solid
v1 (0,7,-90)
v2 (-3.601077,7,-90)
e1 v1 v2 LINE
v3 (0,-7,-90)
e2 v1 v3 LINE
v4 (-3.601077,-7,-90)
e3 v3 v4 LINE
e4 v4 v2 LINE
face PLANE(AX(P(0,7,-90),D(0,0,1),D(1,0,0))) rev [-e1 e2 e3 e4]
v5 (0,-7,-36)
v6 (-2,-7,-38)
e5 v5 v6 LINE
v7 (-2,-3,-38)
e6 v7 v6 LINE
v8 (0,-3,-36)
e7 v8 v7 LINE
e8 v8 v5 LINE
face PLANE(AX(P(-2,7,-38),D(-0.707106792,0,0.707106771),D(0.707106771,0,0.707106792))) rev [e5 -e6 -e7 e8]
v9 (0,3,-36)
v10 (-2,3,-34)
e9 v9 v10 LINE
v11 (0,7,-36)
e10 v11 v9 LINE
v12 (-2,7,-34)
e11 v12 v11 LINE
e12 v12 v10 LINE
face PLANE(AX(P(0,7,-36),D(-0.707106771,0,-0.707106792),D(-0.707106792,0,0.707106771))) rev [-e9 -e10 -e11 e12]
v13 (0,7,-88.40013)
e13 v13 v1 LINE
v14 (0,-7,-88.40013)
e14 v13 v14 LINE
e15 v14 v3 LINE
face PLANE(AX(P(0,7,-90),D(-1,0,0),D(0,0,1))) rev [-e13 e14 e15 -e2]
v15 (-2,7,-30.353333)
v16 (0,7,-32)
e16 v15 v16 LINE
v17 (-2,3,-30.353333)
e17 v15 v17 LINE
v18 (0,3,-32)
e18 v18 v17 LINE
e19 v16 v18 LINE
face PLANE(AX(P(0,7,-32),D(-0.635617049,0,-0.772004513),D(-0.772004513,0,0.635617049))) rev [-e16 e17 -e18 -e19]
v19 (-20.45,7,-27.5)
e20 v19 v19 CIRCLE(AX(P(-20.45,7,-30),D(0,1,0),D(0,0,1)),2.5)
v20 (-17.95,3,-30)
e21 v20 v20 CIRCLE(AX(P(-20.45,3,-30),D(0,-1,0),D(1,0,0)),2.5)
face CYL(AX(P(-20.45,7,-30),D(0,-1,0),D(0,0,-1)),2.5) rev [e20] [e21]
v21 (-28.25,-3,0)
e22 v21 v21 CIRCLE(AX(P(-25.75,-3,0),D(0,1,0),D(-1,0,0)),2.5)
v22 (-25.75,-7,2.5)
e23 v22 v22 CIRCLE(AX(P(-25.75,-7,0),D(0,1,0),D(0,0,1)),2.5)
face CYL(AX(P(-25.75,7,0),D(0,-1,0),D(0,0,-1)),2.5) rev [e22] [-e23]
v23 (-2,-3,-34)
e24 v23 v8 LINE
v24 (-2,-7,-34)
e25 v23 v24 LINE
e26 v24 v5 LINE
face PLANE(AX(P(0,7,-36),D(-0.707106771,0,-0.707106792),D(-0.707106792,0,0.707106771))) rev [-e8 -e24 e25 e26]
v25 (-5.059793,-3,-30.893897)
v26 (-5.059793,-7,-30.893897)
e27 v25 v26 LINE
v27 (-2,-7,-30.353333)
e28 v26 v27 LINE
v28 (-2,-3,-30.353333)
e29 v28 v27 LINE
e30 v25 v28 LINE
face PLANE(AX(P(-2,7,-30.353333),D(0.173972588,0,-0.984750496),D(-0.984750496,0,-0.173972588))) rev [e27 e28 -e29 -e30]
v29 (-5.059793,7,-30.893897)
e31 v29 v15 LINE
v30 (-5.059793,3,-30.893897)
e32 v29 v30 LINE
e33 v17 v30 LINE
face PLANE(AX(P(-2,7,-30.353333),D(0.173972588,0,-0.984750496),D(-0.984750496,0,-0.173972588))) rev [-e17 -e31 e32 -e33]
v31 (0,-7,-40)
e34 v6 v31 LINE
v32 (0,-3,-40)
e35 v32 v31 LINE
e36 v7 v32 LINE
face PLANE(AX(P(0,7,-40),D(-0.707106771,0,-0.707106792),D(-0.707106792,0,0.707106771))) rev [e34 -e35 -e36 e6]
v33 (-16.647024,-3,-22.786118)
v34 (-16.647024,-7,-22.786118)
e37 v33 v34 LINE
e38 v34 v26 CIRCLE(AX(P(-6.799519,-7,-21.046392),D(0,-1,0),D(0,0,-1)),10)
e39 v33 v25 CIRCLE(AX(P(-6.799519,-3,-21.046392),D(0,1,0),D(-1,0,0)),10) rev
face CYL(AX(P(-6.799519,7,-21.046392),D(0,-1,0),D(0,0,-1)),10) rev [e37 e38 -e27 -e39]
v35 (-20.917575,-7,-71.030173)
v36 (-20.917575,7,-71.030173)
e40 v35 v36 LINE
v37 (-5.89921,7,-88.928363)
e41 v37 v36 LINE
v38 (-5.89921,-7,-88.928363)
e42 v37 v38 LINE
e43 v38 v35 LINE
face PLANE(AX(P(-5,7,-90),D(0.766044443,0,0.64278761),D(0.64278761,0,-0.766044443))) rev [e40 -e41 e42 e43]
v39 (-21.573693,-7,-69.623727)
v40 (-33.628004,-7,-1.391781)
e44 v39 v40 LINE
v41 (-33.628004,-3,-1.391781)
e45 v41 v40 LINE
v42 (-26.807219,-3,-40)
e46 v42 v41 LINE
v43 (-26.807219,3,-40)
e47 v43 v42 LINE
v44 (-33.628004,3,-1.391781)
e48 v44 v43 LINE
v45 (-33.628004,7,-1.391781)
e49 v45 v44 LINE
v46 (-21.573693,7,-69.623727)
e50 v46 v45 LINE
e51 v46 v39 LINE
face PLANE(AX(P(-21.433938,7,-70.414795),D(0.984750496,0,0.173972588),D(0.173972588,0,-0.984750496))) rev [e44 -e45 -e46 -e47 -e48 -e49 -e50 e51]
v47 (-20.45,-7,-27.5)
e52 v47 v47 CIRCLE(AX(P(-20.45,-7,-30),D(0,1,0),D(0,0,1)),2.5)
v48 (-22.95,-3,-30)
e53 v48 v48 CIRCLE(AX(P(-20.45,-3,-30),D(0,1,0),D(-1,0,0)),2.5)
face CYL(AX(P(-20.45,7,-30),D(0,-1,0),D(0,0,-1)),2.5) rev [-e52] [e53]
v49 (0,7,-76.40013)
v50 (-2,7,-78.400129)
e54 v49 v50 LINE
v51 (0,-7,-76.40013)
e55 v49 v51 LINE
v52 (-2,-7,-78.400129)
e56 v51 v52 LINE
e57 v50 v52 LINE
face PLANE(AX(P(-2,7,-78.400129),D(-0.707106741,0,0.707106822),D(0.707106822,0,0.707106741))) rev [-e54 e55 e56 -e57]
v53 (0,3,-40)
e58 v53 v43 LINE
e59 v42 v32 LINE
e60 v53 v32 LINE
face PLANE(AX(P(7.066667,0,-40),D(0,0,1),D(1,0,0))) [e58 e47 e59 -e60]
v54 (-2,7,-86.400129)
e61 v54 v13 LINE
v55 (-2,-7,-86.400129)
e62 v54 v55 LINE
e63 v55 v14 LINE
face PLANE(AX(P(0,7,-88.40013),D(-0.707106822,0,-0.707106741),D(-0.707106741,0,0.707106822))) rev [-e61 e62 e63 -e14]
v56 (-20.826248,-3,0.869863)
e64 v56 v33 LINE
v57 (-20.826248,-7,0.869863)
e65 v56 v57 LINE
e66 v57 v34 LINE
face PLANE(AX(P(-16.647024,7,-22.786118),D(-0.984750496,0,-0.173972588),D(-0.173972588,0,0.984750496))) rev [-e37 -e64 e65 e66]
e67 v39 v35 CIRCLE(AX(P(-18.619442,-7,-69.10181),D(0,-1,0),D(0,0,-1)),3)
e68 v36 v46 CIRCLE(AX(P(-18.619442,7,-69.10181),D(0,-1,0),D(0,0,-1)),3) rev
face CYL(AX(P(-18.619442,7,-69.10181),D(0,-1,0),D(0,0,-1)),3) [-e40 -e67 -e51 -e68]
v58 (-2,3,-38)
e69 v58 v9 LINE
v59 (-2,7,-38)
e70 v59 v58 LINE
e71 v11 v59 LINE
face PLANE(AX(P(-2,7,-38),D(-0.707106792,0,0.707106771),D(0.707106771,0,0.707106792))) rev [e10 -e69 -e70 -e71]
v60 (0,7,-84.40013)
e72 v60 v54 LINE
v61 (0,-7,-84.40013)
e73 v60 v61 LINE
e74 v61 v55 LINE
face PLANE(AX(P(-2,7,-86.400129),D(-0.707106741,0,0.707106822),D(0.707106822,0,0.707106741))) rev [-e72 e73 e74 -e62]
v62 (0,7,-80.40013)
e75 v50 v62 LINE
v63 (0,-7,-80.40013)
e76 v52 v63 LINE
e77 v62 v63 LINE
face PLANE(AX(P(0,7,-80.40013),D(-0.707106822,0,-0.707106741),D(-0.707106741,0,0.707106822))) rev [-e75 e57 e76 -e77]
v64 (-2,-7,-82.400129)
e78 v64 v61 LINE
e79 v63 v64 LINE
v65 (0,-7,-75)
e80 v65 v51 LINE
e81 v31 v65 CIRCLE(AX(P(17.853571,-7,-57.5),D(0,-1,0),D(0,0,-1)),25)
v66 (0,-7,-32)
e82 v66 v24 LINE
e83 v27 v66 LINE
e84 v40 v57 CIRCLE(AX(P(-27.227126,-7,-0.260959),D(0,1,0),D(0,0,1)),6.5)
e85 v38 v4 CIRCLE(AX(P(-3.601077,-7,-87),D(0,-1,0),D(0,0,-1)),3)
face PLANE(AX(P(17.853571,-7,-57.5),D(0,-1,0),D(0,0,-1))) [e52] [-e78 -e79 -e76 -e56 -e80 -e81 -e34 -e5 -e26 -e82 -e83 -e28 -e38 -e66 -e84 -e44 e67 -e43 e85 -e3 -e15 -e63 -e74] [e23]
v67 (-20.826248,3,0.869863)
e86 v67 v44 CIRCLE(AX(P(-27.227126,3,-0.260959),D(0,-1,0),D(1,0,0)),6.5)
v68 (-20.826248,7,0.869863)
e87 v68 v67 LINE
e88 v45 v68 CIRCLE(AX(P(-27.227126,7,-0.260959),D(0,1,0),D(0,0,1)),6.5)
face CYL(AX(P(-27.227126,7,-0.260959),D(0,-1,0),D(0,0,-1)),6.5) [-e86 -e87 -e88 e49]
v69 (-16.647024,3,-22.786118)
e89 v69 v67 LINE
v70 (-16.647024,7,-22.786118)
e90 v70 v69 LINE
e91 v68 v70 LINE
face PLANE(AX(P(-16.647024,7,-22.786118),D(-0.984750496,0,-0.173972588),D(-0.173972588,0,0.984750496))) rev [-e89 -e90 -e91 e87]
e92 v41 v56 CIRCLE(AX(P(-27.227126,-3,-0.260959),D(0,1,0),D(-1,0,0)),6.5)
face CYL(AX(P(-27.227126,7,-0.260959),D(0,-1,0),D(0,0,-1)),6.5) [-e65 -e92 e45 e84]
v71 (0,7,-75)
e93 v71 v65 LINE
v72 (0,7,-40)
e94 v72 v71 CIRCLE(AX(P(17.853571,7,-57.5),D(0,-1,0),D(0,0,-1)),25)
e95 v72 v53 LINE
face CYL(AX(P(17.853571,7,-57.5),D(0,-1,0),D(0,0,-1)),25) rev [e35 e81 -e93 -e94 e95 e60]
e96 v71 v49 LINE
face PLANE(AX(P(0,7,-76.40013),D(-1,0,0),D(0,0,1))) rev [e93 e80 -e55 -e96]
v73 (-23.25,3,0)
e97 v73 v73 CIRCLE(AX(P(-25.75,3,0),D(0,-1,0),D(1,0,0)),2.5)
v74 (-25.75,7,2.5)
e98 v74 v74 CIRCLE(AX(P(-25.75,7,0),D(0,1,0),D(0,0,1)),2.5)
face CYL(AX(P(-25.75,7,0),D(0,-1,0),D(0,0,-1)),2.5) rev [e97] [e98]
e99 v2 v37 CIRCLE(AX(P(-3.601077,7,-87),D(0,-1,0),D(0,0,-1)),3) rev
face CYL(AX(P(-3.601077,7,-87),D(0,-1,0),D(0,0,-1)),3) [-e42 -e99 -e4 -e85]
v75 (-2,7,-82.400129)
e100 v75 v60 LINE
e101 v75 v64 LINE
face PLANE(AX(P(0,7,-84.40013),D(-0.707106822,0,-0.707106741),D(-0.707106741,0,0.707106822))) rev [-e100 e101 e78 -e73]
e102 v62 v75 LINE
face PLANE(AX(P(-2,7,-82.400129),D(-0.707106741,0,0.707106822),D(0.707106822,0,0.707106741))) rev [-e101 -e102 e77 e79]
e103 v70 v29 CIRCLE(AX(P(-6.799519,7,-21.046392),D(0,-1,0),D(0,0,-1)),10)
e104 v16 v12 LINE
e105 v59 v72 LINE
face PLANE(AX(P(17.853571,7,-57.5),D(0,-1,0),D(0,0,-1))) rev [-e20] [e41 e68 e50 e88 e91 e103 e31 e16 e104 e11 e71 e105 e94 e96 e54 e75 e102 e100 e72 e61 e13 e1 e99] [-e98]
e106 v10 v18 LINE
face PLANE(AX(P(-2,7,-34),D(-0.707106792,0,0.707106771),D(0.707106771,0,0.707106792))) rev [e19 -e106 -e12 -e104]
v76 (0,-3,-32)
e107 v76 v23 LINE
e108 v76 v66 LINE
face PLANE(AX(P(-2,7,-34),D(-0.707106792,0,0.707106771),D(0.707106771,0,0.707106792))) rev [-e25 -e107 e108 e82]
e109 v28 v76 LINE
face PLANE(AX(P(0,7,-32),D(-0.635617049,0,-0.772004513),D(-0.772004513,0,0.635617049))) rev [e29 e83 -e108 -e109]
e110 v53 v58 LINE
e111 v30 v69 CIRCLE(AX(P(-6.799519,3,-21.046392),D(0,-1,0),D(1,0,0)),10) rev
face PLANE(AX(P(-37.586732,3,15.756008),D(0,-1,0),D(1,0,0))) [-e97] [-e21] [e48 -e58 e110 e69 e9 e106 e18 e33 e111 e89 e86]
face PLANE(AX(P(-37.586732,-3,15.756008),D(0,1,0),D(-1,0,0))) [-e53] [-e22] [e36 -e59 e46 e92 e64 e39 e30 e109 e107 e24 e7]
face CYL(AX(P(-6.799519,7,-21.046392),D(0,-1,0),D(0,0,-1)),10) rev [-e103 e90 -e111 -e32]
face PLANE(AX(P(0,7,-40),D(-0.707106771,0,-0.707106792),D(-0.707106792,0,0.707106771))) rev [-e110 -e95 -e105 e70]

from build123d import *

# Parameters (mm, degrees)
SKETCH1_R              = 2.5
BOSS_EXTRUDE1_DEPTH    = 7
CUT_EXTRUDE1_START     = -40
CUT_EXTRUDE1_OUTLINE_W = 34.803170534
CUT_EXTRUDE1_OUTLINE_H = 6
CUT_EXTRUDE1_DEPTH     = 46.239041119
FILLET1_R              = 3


# Read off the part's stored shape, not the designer's step: Cut-Extrude1
with BuildPart() as part:
    # Sketch1 → Boss-Extrude1 (new, symmetric)
    with BuildSketch(Plane(origin=(0, 0, 0), x_dir=(1, 0, 0), z_dir=(0, 1, 0))):
        with BuildLine():
            Line((-16.647024265, 22.786117759), (-20.826247522, -0.869862938))
            ThreePointArc((-20.826247522, -0.869862938), (-28.357947563, -6.139919341), (-33.628003966, 1.391780701))
            Line((-33.628003966, 1.391780701), (-21.433938056, 70.414795281))
            Line((-21.433938056, 70.414795281), (-5, 90))
            Line((-5, 90), (0, 90))
            Line((0, 90), (0, 88.40012962))
            Line((0, 88.40012962), (-2, 86.400129391))
            Line((-2, 86.400129391), (0, 84.40012962))
            Line((0, 84.40012962), (-2, 82.400129391))
            Line((-2, 82.400129391), (0, 80.40012962))
            Line((0, 80.40012962), (-2, 78.400129391))
            Line((-2, 78.400129391), (0, 76.40012962))
            Line((0, 76.40012962), (0, 75))
            ThreePointArc((0, 75), (-7.146428929, 57.5), (0, 40))
            Line((0, 40), (-2, 38.00000006))
            Line((-2, 38.00000006), (0, 36))
            Line((0, 36), (-2, 34.00000006))
            Line((-2, 34.00000006), (0, 32))
            Line((0, 32), (-2, 30.353333333))
            Line((-2, 30.353333333), (-5.059793432, 30.89389684))
            ThreePointArc((-5.059793432, 30.89389684), (-12.532584877, 29.23980138), (-16.647024265, 22.786117759))
        make_face()
        with Locations(Location((-25.75, 0, 0), (0, 0, 270))):
            Circle(SKETCH1_R, mode=Mode.SUBTRACT)
        with Locations(Location((-20.45, 30, 0), (0, 0, 270))):
            Circle(SKETCH1_R, mode=Mode.SUBTRACT)
    extrude(amount=BOSS_EXTRUDE1_DEPTH, both=True)

    # Cut-Extrude1 outline → Cut-Extrude1 (cut)
    with BuildSketch(Plane.XY.offset(CUT_EXTRUDE1_START)):
        with Locations((-17.401585267, 0)):
            Rectangle(CUT_EXTRUDE1_OUTLINE_W, CUT_EXTRUDE1_OUTLINE_H)
    extrude(amount=CUT_EXTRUDE1_DEPTH, mode=Mode.SUBTRACT)

    # Fillet1
    fillet1_edges = [part.edges().sort_by_distance(p)[0] for p in [
        (-21.433938056, 0, -70.414795281),
        (-5, 0, -90),
    ]]
    fillet(fillet1_edges, radius=FILLET1_R)


solid = part.part
